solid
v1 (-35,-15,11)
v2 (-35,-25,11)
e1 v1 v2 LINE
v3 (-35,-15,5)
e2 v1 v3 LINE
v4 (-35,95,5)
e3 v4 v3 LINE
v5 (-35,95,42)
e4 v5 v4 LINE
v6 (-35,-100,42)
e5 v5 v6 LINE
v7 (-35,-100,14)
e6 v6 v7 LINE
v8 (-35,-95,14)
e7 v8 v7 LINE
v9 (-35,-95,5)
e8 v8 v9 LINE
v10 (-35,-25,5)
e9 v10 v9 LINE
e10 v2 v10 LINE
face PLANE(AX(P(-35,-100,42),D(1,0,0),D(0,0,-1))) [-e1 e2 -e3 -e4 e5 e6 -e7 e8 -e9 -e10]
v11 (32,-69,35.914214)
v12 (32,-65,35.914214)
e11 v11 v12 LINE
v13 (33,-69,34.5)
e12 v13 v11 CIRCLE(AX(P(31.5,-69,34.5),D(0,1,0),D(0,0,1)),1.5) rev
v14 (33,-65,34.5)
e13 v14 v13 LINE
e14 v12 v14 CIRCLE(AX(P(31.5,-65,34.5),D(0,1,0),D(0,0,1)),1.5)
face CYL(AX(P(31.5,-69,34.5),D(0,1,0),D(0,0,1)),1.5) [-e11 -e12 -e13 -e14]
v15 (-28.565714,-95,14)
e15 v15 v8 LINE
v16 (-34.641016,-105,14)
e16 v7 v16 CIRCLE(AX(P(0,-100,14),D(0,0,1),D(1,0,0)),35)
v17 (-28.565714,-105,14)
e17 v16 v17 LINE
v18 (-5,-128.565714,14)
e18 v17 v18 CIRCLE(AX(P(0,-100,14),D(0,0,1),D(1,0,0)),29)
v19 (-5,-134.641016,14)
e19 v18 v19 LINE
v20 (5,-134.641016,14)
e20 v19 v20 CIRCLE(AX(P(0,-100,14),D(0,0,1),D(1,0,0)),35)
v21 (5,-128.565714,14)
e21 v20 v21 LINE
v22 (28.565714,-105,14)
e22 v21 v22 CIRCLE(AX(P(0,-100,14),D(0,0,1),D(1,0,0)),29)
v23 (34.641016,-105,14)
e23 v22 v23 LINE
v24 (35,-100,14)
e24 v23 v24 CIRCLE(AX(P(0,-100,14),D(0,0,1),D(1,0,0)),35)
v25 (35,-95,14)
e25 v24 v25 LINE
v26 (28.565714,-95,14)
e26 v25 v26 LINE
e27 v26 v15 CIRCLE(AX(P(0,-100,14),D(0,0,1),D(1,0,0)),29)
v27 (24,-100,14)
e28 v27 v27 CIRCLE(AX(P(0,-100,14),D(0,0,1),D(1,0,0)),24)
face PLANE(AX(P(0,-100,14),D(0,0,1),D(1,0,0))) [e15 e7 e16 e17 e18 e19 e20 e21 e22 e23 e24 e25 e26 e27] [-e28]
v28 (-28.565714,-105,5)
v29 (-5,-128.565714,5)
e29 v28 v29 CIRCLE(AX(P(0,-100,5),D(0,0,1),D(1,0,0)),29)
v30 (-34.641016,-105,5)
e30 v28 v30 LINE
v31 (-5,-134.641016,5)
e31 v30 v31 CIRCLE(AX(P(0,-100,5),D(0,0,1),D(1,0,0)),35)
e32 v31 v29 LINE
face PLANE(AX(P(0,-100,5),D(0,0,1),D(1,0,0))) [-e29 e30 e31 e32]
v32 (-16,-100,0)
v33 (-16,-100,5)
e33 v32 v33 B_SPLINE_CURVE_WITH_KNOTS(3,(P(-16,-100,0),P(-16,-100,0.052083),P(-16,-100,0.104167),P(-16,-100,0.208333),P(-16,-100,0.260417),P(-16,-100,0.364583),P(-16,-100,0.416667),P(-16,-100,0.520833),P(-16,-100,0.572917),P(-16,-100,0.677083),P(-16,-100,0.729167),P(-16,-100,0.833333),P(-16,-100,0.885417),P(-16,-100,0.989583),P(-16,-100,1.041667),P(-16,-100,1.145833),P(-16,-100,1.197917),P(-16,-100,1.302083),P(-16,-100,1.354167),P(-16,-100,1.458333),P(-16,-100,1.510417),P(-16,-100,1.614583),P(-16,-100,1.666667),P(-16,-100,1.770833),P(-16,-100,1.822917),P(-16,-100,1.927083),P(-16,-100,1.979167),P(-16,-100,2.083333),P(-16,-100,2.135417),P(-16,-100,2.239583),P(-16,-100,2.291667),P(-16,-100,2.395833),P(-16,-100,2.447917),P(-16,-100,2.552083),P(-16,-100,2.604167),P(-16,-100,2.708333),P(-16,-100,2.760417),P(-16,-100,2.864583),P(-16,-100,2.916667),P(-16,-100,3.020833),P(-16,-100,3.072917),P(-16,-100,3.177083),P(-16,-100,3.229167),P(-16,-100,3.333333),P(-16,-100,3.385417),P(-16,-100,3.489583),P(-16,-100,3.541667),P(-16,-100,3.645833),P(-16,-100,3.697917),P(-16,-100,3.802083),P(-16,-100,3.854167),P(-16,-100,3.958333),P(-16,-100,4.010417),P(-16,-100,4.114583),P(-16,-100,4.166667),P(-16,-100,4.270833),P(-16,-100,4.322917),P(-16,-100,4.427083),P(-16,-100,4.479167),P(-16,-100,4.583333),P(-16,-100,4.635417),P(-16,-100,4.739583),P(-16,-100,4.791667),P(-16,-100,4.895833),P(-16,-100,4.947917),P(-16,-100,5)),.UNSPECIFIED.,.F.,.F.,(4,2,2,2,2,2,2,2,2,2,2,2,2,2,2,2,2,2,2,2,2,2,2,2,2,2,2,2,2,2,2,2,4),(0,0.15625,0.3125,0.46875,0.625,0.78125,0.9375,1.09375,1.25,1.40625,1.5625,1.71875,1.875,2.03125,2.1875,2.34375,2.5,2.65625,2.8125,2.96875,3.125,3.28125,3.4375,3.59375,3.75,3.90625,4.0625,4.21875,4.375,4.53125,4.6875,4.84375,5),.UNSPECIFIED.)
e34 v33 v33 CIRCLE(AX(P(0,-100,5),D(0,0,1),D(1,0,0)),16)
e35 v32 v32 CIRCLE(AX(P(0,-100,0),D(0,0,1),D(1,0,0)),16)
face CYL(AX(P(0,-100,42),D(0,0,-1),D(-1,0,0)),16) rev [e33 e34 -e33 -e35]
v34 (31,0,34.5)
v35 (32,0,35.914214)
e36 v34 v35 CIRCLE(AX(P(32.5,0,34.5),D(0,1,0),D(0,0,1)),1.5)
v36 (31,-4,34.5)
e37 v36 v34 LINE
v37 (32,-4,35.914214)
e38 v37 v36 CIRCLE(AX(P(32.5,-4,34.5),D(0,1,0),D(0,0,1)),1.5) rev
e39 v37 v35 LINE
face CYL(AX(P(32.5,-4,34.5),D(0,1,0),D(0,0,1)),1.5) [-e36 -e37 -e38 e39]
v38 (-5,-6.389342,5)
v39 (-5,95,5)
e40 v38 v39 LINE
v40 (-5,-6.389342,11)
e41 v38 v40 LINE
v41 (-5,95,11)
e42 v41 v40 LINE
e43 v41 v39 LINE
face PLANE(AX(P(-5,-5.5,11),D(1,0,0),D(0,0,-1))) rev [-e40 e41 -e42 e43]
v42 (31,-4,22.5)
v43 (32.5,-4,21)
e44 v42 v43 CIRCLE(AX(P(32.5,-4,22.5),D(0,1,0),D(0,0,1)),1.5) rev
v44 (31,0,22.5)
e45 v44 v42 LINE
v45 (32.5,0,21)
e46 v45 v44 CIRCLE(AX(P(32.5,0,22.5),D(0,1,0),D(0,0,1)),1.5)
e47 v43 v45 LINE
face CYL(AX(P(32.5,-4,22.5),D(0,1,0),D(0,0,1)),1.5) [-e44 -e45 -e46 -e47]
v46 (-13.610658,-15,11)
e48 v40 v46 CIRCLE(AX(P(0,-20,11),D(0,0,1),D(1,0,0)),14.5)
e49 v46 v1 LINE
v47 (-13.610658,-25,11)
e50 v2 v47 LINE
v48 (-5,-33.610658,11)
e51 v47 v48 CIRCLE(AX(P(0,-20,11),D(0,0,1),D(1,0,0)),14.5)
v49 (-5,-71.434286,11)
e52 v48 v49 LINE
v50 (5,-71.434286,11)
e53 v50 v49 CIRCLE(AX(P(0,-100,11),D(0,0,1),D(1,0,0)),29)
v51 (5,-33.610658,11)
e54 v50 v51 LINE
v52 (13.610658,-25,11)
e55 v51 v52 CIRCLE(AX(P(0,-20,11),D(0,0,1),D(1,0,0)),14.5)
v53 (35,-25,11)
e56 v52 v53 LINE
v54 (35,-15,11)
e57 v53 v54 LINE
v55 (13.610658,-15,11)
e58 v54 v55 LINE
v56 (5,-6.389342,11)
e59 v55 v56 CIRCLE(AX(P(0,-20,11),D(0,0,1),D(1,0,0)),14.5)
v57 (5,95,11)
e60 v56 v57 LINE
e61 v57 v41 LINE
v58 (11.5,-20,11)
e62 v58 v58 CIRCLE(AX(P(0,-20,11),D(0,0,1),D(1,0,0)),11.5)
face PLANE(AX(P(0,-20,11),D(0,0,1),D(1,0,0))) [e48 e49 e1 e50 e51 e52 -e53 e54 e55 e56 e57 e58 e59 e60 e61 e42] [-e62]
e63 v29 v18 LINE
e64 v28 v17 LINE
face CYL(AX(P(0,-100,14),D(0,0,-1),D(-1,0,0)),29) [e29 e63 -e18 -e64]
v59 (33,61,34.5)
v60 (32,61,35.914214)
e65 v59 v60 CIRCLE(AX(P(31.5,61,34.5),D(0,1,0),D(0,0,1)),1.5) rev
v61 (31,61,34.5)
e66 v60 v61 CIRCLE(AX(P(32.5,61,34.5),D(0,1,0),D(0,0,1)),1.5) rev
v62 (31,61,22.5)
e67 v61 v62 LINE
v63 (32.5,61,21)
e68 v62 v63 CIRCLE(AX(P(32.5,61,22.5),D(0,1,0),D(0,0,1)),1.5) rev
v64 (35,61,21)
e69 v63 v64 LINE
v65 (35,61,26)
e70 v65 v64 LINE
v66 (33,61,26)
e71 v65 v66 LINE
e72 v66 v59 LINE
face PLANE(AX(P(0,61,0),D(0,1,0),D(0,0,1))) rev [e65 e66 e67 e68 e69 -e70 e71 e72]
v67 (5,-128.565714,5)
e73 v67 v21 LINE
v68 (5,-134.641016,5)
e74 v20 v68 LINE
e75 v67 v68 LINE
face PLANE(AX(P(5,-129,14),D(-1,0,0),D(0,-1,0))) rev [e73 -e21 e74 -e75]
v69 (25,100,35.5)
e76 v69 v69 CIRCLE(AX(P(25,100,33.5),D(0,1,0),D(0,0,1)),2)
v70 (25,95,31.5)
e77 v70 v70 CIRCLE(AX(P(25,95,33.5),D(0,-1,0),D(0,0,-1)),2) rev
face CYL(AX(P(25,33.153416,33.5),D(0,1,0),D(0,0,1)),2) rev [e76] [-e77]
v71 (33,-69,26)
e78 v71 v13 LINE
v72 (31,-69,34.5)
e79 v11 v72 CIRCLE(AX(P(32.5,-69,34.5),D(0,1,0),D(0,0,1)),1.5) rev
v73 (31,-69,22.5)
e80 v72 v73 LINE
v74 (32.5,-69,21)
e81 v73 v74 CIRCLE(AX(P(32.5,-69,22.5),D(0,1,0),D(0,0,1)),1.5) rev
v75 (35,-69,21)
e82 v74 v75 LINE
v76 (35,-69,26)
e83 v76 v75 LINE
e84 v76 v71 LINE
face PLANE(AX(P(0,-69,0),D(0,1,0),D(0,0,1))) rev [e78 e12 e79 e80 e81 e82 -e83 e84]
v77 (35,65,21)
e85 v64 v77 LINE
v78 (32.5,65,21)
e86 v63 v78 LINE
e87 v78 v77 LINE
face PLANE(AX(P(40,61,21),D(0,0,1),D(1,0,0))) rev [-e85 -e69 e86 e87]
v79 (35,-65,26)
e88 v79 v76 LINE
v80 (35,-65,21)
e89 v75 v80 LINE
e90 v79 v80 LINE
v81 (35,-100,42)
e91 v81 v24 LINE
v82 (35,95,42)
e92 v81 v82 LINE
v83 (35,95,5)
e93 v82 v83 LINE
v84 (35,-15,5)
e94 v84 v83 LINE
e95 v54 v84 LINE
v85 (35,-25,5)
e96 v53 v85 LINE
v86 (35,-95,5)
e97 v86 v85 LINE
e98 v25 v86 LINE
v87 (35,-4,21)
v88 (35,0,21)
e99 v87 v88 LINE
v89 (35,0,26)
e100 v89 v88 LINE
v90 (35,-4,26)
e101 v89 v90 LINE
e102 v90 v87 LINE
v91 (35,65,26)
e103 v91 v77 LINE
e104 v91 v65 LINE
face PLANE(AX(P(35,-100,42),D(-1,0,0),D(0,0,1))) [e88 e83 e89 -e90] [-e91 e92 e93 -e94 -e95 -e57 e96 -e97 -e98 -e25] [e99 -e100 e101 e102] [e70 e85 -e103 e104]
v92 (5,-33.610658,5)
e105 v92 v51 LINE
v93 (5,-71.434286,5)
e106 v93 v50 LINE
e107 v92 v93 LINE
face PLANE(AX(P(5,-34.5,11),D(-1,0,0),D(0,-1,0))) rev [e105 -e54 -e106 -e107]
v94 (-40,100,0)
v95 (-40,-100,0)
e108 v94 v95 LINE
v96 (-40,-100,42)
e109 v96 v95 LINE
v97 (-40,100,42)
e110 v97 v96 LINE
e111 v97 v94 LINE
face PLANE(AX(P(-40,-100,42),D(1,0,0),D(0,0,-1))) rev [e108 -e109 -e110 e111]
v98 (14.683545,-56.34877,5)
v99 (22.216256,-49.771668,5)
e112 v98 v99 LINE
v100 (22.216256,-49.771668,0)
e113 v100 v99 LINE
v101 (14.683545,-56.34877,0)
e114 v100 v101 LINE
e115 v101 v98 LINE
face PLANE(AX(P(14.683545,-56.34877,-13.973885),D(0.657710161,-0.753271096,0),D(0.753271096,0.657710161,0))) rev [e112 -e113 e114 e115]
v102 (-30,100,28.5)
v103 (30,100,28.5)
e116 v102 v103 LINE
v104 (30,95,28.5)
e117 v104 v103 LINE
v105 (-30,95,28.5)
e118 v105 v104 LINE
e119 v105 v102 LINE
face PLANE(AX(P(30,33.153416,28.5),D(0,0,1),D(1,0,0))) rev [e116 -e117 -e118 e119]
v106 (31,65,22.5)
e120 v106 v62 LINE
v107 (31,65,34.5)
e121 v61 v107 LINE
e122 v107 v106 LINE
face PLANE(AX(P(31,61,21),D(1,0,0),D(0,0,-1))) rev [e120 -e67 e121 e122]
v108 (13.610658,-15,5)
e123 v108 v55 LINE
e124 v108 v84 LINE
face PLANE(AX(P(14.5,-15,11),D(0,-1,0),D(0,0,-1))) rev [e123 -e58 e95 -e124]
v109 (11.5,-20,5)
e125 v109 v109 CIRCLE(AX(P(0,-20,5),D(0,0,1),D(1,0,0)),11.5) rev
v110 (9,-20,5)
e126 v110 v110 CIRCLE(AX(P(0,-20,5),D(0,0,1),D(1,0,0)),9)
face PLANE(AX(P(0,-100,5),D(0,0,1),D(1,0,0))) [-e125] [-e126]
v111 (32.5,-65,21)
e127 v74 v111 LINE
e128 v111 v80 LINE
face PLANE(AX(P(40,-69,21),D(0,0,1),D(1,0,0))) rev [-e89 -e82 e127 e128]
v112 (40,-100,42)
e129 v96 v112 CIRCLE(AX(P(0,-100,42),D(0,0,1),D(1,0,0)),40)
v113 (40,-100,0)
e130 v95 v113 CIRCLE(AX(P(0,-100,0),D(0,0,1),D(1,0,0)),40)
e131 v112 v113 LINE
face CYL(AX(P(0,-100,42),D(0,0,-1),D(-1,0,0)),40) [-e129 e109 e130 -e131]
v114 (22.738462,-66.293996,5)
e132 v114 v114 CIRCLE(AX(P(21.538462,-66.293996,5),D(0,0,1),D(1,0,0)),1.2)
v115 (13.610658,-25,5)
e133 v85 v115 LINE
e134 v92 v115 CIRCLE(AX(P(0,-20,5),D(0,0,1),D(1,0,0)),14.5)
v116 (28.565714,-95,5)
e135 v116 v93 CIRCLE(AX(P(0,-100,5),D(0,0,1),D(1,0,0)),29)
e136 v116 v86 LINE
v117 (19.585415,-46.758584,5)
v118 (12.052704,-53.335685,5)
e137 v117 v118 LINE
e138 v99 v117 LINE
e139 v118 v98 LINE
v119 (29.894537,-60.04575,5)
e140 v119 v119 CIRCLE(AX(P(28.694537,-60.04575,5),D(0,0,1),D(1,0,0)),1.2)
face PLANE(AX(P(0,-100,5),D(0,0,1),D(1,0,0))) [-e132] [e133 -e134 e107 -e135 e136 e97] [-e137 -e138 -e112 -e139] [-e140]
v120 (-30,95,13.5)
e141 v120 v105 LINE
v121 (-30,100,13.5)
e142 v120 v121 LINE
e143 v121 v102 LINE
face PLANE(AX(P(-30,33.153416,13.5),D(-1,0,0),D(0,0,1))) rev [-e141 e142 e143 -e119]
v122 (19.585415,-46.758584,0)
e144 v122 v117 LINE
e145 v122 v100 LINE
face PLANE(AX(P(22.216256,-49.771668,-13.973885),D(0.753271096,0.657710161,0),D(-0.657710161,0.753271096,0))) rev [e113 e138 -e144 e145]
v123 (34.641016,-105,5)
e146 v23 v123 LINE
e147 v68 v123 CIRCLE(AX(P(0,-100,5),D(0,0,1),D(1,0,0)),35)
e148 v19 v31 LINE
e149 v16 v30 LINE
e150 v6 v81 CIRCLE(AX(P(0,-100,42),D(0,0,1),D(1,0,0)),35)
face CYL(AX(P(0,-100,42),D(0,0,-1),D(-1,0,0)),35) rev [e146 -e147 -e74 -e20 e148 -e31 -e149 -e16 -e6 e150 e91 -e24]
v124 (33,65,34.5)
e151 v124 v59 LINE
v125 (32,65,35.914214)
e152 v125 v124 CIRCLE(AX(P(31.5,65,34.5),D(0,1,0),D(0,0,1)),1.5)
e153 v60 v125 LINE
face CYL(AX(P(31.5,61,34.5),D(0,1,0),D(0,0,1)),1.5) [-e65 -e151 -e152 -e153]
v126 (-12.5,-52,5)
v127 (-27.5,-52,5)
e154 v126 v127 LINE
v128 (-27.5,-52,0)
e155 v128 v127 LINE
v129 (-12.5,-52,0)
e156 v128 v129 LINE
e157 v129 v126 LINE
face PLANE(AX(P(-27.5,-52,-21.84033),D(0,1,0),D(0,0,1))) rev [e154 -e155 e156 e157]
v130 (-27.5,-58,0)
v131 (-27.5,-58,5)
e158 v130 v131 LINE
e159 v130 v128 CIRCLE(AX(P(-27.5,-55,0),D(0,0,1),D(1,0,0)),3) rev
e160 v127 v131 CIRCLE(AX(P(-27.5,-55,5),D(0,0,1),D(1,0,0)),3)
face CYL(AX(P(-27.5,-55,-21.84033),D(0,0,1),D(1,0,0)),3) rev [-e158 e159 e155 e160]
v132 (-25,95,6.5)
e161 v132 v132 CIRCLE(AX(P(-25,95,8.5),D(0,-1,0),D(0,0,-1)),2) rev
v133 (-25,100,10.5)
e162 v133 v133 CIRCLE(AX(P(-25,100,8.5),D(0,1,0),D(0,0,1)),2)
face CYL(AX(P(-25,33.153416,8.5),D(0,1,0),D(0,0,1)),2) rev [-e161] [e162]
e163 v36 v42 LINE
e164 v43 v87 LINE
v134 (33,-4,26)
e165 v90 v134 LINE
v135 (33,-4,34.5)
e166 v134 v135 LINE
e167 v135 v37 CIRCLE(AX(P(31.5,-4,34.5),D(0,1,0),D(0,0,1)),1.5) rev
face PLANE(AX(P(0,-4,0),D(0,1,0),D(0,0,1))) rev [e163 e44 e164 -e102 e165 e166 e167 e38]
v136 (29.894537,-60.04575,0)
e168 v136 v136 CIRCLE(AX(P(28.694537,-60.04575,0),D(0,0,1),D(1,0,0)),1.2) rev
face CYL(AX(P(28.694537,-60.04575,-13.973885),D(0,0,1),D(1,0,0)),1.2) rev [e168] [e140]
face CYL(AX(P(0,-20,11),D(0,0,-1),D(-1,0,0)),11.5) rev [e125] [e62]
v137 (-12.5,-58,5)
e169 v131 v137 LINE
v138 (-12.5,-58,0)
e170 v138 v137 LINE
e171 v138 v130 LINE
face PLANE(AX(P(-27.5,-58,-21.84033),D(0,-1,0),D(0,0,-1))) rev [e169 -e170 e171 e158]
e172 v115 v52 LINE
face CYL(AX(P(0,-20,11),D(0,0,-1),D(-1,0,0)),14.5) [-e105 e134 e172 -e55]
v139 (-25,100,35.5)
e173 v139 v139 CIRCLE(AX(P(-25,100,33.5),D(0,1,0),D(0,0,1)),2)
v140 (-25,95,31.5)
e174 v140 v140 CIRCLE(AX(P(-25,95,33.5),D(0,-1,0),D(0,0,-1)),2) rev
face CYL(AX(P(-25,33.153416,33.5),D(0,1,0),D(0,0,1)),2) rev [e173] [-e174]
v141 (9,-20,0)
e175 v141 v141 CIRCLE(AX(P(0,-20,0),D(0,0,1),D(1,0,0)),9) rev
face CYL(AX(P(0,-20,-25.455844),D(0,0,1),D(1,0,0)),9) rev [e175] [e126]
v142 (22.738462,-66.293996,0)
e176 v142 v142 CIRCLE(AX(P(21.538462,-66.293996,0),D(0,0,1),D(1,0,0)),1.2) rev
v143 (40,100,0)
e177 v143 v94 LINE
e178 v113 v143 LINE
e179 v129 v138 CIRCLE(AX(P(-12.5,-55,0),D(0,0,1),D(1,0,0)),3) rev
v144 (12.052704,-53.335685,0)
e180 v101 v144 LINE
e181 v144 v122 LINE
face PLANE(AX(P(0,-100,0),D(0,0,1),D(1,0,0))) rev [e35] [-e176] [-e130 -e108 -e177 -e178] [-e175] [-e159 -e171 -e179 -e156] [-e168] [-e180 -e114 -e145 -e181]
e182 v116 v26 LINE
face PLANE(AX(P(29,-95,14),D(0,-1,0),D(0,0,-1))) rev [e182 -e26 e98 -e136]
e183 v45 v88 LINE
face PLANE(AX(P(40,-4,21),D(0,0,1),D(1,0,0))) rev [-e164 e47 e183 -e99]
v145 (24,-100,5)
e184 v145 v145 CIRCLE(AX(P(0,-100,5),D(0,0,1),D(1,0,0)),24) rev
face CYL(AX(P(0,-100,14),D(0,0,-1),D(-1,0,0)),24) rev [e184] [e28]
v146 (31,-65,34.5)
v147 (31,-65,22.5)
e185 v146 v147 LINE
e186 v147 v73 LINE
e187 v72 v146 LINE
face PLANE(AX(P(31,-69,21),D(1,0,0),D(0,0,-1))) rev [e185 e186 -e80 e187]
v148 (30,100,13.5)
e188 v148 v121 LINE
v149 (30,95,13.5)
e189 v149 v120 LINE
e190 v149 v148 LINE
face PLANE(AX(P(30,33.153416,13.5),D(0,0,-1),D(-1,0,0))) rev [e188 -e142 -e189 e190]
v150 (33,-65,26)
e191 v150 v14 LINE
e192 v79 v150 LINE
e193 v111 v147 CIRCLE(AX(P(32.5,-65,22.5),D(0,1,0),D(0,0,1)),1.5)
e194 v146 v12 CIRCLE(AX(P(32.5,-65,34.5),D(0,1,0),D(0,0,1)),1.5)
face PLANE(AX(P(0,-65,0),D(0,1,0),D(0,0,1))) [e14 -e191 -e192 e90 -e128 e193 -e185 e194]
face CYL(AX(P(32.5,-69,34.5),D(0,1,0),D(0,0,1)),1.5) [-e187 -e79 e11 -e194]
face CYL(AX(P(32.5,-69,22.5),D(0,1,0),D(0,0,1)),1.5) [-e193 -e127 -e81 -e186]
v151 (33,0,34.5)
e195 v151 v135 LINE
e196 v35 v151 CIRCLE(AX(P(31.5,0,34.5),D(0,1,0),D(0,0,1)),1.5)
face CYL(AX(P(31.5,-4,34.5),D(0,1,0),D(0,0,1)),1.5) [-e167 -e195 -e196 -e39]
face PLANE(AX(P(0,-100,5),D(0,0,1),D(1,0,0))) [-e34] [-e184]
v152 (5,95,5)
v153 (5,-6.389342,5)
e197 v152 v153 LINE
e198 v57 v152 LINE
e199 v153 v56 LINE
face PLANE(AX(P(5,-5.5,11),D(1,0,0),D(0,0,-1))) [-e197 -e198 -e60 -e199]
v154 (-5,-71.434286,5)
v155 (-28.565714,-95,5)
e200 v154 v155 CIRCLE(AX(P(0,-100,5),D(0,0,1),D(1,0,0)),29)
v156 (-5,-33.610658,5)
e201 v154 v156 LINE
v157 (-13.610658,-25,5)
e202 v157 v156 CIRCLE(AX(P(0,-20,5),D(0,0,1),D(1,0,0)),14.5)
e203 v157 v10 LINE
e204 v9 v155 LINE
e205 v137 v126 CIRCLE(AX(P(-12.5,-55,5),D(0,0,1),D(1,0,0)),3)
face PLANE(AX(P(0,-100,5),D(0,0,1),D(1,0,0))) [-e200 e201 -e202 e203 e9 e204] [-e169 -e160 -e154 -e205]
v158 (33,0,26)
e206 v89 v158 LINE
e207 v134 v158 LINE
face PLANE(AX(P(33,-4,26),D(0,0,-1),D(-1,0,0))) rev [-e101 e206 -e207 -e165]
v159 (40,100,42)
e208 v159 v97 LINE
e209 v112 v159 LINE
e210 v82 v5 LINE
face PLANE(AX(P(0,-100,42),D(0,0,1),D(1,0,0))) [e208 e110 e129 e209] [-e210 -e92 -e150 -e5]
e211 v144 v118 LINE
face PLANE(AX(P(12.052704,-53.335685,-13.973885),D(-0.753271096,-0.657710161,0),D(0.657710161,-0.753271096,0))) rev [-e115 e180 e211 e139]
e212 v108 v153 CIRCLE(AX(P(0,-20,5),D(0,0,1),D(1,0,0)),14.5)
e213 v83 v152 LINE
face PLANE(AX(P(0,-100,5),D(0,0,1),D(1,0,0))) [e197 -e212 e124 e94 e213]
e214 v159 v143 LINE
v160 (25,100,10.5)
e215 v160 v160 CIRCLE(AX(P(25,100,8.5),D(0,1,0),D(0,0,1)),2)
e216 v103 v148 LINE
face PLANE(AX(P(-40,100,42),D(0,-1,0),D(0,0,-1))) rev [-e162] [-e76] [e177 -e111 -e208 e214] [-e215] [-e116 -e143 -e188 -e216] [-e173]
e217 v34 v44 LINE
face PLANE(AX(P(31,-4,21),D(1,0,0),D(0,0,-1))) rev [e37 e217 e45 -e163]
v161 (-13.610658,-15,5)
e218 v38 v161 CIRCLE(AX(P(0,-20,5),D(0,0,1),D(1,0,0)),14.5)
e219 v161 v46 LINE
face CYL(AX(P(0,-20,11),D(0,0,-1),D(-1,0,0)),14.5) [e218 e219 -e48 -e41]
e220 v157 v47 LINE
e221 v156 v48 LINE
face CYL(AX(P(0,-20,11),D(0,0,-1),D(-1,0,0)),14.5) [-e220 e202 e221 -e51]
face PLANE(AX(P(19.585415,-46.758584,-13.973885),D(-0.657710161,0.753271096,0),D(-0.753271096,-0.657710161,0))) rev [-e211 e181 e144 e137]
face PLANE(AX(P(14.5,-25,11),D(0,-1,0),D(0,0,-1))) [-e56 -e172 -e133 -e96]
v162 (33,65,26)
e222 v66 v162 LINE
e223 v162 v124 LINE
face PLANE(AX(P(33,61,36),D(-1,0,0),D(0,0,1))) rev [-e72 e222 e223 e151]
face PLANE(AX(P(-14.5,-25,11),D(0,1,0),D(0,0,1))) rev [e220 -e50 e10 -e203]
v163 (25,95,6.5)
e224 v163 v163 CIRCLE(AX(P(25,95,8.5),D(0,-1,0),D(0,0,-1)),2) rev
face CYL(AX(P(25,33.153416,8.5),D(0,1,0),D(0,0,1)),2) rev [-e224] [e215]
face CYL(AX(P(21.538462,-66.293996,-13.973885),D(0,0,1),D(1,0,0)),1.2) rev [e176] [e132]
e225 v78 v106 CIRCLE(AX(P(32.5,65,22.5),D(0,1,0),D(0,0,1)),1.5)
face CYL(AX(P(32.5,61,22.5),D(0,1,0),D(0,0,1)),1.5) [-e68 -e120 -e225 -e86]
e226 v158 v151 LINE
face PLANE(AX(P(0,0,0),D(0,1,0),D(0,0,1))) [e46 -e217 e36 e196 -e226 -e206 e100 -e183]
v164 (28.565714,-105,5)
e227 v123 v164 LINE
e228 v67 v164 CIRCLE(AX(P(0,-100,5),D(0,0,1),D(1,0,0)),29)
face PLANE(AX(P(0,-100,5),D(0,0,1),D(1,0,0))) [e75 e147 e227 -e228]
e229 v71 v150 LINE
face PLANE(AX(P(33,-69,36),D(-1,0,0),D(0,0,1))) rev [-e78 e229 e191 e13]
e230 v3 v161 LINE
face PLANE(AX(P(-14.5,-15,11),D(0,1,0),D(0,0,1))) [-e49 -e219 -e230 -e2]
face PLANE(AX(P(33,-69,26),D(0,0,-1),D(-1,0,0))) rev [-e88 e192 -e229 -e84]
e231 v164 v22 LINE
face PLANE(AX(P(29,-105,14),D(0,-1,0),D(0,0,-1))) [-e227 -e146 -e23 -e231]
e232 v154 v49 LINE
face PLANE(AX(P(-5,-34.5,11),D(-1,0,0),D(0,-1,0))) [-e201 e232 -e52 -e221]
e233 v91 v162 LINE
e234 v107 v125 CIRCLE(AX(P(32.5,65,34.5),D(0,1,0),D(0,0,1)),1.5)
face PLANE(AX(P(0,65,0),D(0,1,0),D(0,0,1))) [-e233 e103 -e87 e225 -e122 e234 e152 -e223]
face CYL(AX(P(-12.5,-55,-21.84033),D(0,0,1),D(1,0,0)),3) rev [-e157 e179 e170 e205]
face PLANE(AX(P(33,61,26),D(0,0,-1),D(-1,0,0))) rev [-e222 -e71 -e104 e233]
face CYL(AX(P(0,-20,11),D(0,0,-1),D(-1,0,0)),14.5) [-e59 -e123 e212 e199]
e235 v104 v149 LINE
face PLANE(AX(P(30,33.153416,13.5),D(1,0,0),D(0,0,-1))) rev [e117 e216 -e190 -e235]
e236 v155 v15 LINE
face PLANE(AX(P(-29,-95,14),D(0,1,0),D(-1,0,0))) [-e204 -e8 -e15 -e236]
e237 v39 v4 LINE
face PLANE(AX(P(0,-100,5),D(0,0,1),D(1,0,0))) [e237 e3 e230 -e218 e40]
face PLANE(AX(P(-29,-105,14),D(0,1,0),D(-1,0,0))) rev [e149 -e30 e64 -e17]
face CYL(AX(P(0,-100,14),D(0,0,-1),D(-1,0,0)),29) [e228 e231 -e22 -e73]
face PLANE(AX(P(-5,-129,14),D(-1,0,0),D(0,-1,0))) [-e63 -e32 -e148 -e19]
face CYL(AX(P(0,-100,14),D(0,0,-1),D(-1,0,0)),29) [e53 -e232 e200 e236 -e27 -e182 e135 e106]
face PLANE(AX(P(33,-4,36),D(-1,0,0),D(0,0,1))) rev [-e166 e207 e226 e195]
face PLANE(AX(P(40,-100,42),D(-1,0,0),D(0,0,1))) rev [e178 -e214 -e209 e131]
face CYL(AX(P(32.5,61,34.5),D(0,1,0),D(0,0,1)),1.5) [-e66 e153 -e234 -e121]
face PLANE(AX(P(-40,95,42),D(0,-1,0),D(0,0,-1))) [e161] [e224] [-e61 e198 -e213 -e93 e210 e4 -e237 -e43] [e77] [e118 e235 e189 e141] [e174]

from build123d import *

# Parameters (mm, degrees)
ESBO_O1_R                   = 16
RESSALTO_EXTRUS_O1_DEPTH    = 42
CASCA1_T                    = -5
ESBO_O3_R                   = 2
ESBO_O3_W                   = 60
ESBO_O3_H                   = 15
CORTE_EXTRUS_O1_DEPTH       = 5
ESBO_O4_R                   = 29
ESBO_O4_R_2                 = 24
RESSALTO_EXTRUS_O2_DEPTH    = 9
ESBO_O5_R                   = 9
CORTE_EXTRUS_O2_DEPTH       = 5
ESBO_O6_R                   = 14.5
ESBO_O6_R_2                 = 11.5
RESSALTO_EXTRUS_O3_DEPTH    = 6
NERVURA1_REACH              = 150.27
ESBO_O7_WALLS_W             = 304.540047886
ESBO_O7_WALLS_H             = 10
ESBO_O7_WALLS_W_2           = 10
ESBO_O7_WALLS_H_2           = 304.540047886
NERVURA2_REACH              = 150.866
ESBO_O8_WALLS_W             = 320.231422594
ESBO_O8_WALLS_H             = 10
ESBO_O8_WALLS_W_2           = 10
ESBO_O8_WALLS_H_2           = 400.231422594
ESBO_O8_WALLS_H_3           = 336.231422594
CORTE_EXTRUS_O3_DEPTH       = 5
ESBO_O10_R                  = 1.2
CORTE_EXTRUS_O4_DEPTH       = 5
RESSALTO_EXTRUS_O4_DEPTH    = 4
FILETE1_R                   = 1.5
PADR_O_LINEAR1_COUNT        = 3
PADR_O_LINEAR1_PITCH        = 65
FILETE1_OF_PADR_O_LINEAR1_R = 1.5


with BuildPart() as part:
    # Esboço1 → Ressalto-extrusão1 (new body)
    with BuildSketch(Plane.XY):
        with BuildLine():
            Line((-40, -100), (-40, 100))
            Line((-40, 100), (40, 100))
            Line((40, 100), (40, -100))
            ThreePointArc((40, -100), (0, -140), (-40, -100))
        make_face()
        with Locations(Location((0, -100, 0), (0, 0, 180))):
            Circle(ESBO_O1_R, mode=Mode.SUBTRACT)
    extrude(amount=RESSALTO_EXTRUS_O1_DEPTH)

    # Casca1
    casca1_openings = [part.faces().sort_by_distance(p)[0] for p in [
        (0, -12.059912395, 42),
        (16, -100, 21),
    ]]
    offset(amount=CASCA1_T, openings=casca1_openings, kind=Kind.INTERSECTION)

    # Esboço3 → Corte-extrusão1 (cut)
    with BuildSketch(Plane(origin=(0, 100, 0), x_dir=(1, 0, 0), z_dir=(0, 1, 0))):
        with Locations(Location((25, -33.5, 0), (0, 0, 270))):
            Circle(ESBO_O3_R)
        with Locations(Location((-25, -33.5, 0), (0, 0, 270))):
            Circle(ESBO_O3_R)
        with Locations(Location((-25, -8.5, 0), (0, 0, 270))):
            Circle(ESBO_O3_R)
        with Locations(Location((25, -8.5, 0), (0, 0, 270))):
            Circle(ESBO_O3_R)
        with Locations((0, -21)):
            Rectangle(ESBO_O3_W, ESBO_O3_H)
    extrude(amount=-CORTE_EXTRUS_O1_DEPTH, mode=Mode.SUBTRACT)

    # Esboço4 → Ressalto-extrusão2 (add)
    with BuildSketch(Plane.XY.offset(5)):
        with Locations((0, -100)):
            Circle(ESBO_O4_R)
        with Locations((0, -100)):
            Circle(ESBO_O4_R_2, mode=Mode.SUBTRACT)
    extrude(amount=RESSALTO_EXTRUS_O2_DEPTH)

    # Esboço5 → Corte-extrusão2 (cut)
    with BuildSketch(Plane.XY.offset(5)):
        with Locations((0, -20)):
            Circle(ESBO_O5_R)
    extrude(amount=-CORTE_EXTRUS_O2_DEPTH, mode=Mode.SUBTRACT)

    # Esboço6 → Ressalto-extrusão3 (add)
    with BuildSketch(Plane.XY.offset(5)):
        with Locations((0, -20)):
            Circle(ESBO_O6_R)
        with Locations((0, -20)):
            Circle(ESBO_O6_R_2, mode=Mode.SUBTRACT)
    extrude(amount=RESSALTO_EXTRUS_O3_DEPTH)

    # Esboço7 walls → Nervura1 (add, up to next)
    with BuildSketch(Plane.XY.offset(14), mode=Mode.PRIVATE) as nervura1_sk1:
        with Locations((32, -100)):
            Rectangle(ESBO_O7_WALLS_W, ESBO_O7_WALLS_H)
    nervura1_tool1 = extrude(nervura1_sk1.sketch, amount=-NERVURA1_REACH, mode=Mode.PRIVATE) - part.part
    # Esboço7 walls → Nervura1 (add, up to next)
    with BuildSketch(Plane.XY.offset(14), mode=Mode.PRIVATE) as nervura1_sk2:
        with Locations((-32, -100)):
            Rectangle(ESBO_O7_WALLS_W, ESBO_O7_WALLS_H)
    nervura1_tool2 = extrude(nervura1_sk2.sketch, amount=-NERVURA1_REACH, mode=Mode.PRIVATE) - part.part
    # Esboço7 walls → Nervura1 (add, up to next)
    with BuildSketch(Plane.XY.offset(14), mode=Mode.PRIVATE) as nervura1_sk3:
        with Locations((0, -132)):
            Rectangle(ESBO_O7_WALLS_W_2, ESBO_O7_WALLS_H_2)
    nervura1_tool3 = extrude(nervura1_sk3.sketch, amount=-NERVURA1_REACH, mode=Mode.PRIVATE) - part.part
    add(nervura1_tool1.solids().sort_by_distance((32, -100, 14))[0])
    add(nervura1_tool2.solids().sort_by_distance((-32, -100, 14))[0])
    add(nervura1_tool3.solids().sort_by_distance((0, -132, 14))[0])

    # Esboço8 walls → Nervura2 (add, up to next)
    with BuildSketch(Plane.XY.offset(11), mode=Mode.PRIVATE) as nervura2_sk1:
        with Locations((24.75, -20)):
            Rectangle(ESBO_O8_WALLS_W, ESBO_O8_WALLS_H)
    nervura2_tool1 = extrude(nervura2_sk1.sketch, amount=-NERVURA2_REACH, mode=Mode.PRIVATE) - part.part
    # Esboço8 walls → Nervura2 (add, up to next)
    with BuildSketch(Plane.XY.offset(11), mode=Mode.PRIVATE) as nervura2_sk2:
        with Locations((-24.75, -20)):
            Rectangle(ESBO_O8_WALLS_W, ESBO_O8_WALLS_H)
    nervura2_tool2 = extrude(nervura2_sk2.sketch, amount=-NERVURA2_REACH, mode=Mode.PRIVATE) - part.part
    # Esboço8 walls → Nervura2 (add, up to next)
    with BuildSketch(Plane.XY.offset(11), mode=Mode.PRIVATE) as nervura2_sk3:
        with Locations((0, 44.75)):
            Rectangle(ESBO_O8_WALLS_W_2, ESBO_O8_WALLS_H_2)
    nervura2_tool3 = extrude(nervura2_sk3.sketch, amount=-NERVURA2_REACH, mode=Mode.PRIVATE) - part.part
    # Esboço8 walls → Nervura2 (add, up to next)
    with BuildSketch(Plane.XY.offset(11), mode=Mode.PRIVATE) as nervura2_sk4:
        with Locations((0, -52.75)):
            Rectangle(ESBO_O8_WALLS_W_2, ESBO_O8_WALLS_H_3)
    nervura2_tool4 = extrude(nervura2_sk4.sketch, amount=-NERVURA2_REACH, mode=Mode.PRIVATE) - part.part
    add(nervura2_tool1.solids().sort_by_distance((24.75, -20, 11))[0])
    add(nervura2_tool2.solids().sort_by_distance((-24.75, -20, 11))[0])
    add(nervura2_tool3.solids().sort_by_distance((0, 44.75, 11))[0])
    add(nervura2_tool4.solids().sort_by_distance((0, -52.75, 11))[0])

    # Esboço9 → Corte-extrusão3 (cut)
    with BuildSketch(Plane.XY.offset(5)):
        with BuildLine():
            Line((-27.5, -52), (-12.5, -52))
            ThreePointArc((-12.5, -52), (-9.5, -55), (-12.5, -58))
            Line((-12.5, -58), (-27.5, -58))
            ThreePointArc((-27.5, -58), (-30.5, -55), (-27.5, -52))
        make_face()
    extrude(amount=-CORTE_EXTRUS_O3_DEPTH, mode=Mode.SUBTRACT)

    # Esboço10 → Corte-extrusão4 (cut)
    with BuildSketch(Plane.XY.offset(5)):
        with Locations((21.538461538, -66.293996461)):
            Circle(ESBO_O10_R)
        with Locations((28.694536951, -60.045749932)):
            Circle(ESBO_O10_R)
        Polygon((14.683545029, -56.348769838), (22.216255989, -49.771668228), (19.585415345, -46.758583844), (12.052704385, -53.335685454), align=None)
    extrude(amount=-CORTE_EXTRUS_O4_DEPTH, mode=Mode.SUBTRACT)

    # Esboço11 → Ressalto-extrusão4 (add)
    with BuildSketch(Plane(origin=(0, -65, 0), x_dir=(-1, 0, 0), z_dir=(0, -1, 0))):
        Polygon((-40, -21), (-31, -21), (-31, -36), (-33, -36), (-33, -26), (-40, -26), align=None)
    ressalto_extrus_o4 = extrude(amount=RESSALTO_EXTRUS_O4_DEPTH)

    # Filete1
    # the kernel refuses this fillet: 1.5 mm, written as the material it takes off along each edge
    with BuildSketch(Plane(origin=(31, -61.25, 21), x_dir=(1, 0, 0), z_dir=(0, -1, 0)), Plane(origin=(31, -61.25, 36), x_dir=(0, 0, -1), z_dir=(0, -1, 0))) as filete1_piece_1:
        with BuildLine():
            CenterArc((FILETE1_R, FILETE1_R), FILETE1_R, 180, 90)
            Line((0, FILETE1_R), (0, 0))
            Line((0, 0), (FILETE1_R, 0))
        make_face()
    extrude(amount=11.5, mode=Mode.SUBTRACT)
    with BuildSketch(Plane(origin=(33, -61.25, 36), x_dir=(0, 0, -1), z_dir=(0, -1, 0))) as filete1_piece_2:
        with BuildLine():
            CenterArc((FILETE1_R, -FILETE1_R), FILETE1_R, 90, 90)
            Line((0, -FILETE1_R), (0, 0))
            Line((0, 0), (FILETE1_R, 0))
        make_face()
    extrude(amount=11.5, mode=Mode.SUBTRACT)

    # Padrão linear1: Ressalto-extrusão4 ×3
    with Locations(*[(0, i * PADR_O_LINEAR1_PITCH, 0) for i in range(1, PADR_O_LINEAR1_COUNT)]):
        add(ressalto_extrus_o4)

    # Filete1 of Padrão linear1
    # the kernel refuses this fillet: 1.5 mm, written as the material it takes off along each edge
    with BuildSketch(Plane(origin=(31, 3.75, 21), x_dir=(1, 0, 0), z_dir=(0, -1, 0)), Plane(origin=(31, 3.75, 36), x_dir=(0, 0, -1), z_dir=(0, -1, 0)), Plane(origin=(31, 68.75, 21), x_dir=(1, 0, 0), z_dir=(0, -1, 0)), Plane(origin=(31, 68.75, 36), x_dir=(0, 0, -1), z_dir=(0, -1, 0))) as filete1_of_padr_o_linear1_piece_1:
        with BuildLine():
            CenterArc((FILETE1_OF_PADR_O_LINEAR1_R, FILETE1_OF_PADR_O_LINEAR1_R), FILETE1_OF_PADR_O_LINEAR1_R, 180, 90)
            Line((0, FILETE1_OF_PADR_O_LINEAR1_R), (0, 0))
            Line((0, 0), (FILETE1_OF_PADR_O_LINEAR1_R, 0))
        make_face()
    extrude(amount=11.5, mode=Mode.SUBTRACT)
    with BuildSketch(Plane(origin=(33, 3.75, 36), x_dir=(0, 0, -1), z_dir=(0, -1, 0)), Plane(origin=(33, 68.75, 36), x_dir=(0, 0, -1), z_dir=(0, -1, 0))) as filete1_of_padr_o_linear1_piece_2:
        with BuildLine():
            CenterArc((FILETE1_OF_PADR_O_LINEAR1_R, -FILETE1_OF_PADR_O_LINEAR1_R), FILETE1_OF_PADR_O_LINEAR1_R, 90, 90)
            Line((0, -FILETE1_OF_PADR_O_LINEAR1_R), (0, 0))
            Line((0, 0), (FILETE1_OF_PADR_O_LINEAR1_R, 0))
        make_face()
    extrude(amount=11.5, mode=Mode.SUBTRACT)


solid = part.part
